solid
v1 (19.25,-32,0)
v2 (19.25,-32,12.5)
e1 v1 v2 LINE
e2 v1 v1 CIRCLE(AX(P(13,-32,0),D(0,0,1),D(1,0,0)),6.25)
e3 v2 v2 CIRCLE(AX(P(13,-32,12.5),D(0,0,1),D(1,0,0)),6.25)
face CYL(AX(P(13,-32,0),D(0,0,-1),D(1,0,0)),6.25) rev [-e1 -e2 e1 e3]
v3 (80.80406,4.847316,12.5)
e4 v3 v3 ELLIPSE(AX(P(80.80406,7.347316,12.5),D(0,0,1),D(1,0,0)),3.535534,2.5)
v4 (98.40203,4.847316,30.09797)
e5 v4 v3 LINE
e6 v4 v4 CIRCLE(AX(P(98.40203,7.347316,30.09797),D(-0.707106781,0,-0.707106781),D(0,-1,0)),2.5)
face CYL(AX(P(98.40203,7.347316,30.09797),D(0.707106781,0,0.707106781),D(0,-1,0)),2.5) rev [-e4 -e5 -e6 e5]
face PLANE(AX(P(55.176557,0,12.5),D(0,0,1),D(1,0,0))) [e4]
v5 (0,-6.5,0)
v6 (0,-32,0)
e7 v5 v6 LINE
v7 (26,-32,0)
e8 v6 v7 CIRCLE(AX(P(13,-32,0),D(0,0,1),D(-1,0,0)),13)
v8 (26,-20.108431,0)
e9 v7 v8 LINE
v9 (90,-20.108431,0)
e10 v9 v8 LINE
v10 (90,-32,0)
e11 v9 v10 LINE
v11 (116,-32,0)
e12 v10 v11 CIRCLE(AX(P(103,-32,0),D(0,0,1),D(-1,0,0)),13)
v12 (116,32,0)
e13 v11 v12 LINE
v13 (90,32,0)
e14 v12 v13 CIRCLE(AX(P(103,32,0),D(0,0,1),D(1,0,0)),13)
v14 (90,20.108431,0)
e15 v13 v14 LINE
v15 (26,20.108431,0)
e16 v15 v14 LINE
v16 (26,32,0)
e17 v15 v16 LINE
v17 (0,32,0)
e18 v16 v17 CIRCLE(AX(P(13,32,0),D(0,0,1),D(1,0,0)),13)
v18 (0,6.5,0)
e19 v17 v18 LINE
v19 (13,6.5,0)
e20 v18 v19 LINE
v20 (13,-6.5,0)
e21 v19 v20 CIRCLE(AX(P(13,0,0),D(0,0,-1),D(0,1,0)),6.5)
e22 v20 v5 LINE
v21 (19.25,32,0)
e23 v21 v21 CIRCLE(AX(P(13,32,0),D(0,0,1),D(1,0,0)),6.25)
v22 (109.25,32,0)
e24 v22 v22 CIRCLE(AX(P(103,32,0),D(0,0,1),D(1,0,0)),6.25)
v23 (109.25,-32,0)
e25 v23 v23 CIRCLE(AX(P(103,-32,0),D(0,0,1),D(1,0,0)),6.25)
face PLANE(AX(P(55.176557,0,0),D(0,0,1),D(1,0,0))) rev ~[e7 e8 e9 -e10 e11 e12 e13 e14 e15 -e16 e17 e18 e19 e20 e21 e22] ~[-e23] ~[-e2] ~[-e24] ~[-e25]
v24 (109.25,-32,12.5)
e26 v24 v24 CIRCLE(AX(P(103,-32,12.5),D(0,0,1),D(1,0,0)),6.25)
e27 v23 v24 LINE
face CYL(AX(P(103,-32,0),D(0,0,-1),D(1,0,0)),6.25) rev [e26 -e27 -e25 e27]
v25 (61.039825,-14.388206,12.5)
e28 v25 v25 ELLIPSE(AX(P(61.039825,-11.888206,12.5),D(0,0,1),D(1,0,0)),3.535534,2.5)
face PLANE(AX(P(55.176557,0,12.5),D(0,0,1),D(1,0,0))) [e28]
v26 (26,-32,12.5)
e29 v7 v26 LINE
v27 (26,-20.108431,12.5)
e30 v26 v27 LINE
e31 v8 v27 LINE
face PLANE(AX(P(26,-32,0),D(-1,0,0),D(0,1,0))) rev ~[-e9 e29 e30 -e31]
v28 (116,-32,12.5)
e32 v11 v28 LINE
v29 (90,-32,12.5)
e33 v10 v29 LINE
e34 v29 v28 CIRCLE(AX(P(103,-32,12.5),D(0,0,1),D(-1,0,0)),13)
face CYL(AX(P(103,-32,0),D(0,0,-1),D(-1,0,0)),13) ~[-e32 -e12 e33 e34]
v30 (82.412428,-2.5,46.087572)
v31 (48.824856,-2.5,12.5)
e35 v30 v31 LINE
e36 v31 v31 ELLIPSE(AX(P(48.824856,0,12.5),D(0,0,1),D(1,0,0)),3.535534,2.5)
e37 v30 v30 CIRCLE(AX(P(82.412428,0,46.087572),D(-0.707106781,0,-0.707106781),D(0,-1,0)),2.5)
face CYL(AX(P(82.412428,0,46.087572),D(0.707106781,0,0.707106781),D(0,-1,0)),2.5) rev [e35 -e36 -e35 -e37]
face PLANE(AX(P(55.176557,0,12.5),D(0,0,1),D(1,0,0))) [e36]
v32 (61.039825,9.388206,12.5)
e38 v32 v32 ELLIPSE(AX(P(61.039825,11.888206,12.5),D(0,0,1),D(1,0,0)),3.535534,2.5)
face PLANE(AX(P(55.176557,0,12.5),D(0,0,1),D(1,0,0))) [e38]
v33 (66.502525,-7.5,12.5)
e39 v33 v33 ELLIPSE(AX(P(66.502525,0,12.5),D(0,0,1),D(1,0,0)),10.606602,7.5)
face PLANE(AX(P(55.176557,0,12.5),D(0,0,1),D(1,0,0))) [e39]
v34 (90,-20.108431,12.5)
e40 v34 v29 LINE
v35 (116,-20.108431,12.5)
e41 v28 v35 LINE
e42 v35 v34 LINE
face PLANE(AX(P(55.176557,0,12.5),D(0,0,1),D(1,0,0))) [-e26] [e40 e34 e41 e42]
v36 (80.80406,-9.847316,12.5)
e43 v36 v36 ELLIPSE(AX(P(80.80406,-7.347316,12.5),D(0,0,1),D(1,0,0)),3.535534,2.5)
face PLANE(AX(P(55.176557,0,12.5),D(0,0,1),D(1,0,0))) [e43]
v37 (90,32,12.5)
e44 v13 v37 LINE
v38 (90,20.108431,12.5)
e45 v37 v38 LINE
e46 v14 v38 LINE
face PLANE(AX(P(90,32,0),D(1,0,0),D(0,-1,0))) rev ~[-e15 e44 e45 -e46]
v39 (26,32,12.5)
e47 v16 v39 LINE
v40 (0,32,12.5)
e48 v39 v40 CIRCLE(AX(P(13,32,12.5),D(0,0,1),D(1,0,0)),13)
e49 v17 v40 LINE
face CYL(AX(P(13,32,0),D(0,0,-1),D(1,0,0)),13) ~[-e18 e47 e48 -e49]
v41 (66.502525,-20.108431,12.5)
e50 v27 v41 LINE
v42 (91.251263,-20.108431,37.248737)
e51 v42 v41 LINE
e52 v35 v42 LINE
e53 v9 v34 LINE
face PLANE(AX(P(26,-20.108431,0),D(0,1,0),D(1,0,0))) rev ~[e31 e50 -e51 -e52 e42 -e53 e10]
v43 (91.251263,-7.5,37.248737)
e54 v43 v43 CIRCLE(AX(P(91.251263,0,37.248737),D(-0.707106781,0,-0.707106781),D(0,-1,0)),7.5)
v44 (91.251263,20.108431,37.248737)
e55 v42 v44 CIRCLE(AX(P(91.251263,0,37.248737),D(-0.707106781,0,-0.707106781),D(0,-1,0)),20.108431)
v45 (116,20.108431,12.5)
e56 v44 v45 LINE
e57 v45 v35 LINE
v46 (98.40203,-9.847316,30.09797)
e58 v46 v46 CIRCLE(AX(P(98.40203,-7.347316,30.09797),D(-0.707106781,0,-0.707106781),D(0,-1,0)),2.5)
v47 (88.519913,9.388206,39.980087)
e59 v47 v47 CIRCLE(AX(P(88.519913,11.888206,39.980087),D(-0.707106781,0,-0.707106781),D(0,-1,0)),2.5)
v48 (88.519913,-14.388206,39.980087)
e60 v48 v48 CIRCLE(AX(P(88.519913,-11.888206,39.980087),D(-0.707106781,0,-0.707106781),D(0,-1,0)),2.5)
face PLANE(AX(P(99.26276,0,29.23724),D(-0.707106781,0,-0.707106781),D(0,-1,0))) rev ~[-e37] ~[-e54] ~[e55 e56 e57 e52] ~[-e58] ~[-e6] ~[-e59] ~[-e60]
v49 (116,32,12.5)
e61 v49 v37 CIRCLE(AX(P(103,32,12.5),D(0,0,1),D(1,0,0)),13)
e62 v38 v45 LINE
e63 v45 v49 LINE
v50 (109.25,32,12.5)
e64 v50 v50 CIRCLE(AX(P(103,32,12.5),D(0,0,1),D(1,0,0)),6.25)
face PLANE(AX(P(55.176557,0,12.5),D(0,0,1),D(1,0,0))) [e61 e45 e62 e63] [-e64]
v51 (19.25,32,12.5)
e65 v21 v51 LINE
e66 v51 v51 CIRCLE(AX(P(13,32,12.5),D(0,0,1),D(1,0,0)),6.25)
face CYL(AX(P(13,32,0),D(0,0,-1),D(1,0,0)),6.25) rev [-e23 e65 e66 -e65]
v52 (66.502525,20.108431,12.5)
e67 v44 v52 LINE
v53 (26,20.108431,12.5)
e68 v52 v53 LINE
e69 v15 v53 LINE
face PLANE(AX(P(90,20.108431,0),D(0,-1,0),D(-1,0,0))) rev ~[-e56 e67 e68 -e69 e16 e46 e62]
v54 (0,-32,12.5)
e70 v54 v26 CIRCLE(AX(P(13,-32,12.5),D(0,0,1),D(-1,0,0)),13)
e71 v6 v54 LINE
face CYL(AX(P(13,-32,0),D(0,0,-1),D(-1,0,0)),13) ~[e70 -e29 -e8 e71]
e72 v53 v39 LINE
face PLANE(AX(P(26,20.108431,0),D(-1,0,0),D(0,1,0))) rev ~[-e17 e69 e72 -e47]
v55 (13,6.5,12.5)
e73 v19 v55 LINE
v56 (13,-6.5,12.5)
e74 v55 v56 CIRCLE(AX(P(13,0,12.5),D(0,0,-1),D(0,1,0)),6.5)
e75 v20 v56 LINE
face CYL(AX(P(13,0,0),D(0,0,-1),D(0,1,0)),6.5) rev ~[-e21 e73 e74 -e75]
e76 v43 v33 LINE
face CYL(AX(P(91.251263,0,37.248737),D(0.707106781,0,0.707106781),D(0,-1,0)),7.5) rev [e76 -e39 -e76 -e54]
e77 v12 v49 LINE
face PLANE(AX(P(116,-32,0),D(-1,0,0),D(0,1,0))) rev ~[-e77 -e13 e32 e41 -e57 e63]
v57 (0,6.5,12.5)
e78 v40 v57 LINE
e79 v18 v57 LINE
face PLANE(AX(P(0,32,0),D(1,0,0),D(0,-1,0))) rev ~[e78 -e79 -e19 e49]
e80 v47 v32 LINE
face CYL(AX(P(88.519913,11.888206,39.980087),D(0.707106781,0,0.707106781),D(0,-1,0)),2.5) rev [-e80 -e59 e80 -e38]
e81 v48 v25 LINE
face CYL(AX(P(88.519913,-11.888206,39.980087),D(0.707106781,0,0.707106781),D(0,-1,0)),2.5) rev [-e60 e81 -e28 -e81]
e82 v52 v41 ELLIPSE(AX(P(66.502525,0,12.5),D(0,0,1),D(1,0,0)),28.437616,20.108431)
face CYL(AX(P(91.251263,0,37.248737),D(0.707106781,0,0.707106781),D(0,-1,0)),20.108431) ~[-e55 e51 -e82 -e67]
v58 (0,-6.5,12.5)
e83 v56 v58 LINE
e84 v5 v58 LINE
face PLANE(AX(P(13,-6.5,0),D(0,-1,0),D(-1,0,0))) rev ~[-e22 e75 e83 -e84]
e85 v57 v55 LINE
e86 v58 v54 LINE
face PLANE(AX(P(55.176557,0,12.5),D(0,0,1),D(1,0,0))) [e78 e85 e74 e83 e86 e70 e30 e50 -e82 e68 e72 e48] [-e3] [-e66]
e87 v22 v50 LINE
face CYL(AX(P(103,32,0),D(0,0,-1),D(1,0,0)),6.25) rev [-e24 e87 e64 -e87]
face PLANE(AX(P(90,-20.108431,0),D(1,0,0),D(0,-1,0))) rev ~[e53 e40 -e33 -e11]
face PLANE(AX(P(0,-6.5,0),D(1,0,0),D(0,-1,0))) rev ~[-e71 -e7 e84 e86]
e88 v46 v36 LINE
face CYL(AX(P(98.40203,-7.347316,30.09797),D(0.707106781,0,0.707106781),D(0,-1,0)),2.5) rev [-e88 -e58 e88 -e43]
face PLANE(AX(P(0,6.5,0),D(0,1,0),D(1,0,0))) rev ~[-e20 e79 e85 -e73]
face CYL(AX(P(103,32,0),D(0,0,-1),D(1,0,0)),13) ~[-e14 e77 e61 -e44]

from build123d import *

# Parameters (mm, degrees)
F0_R     = 6.25
F1_DEPTH = 12.5
F3_R     = 2.5
F3_R_2   = 7.5
F4_REACH = 159.0869091096


with BuildPart() as f1:
    # F0 (on Top) → F1 (new body)
    with BuildSketch(Plane.XY):
        with BuildLine():
            Line((0, 32), (0, 6.5))
            Line((0, 6.5), (13, 6.5))
            ThreePointArc((13, 6.5), (19.5, 0), (13, -6.5))
            Line((13, -6.5), (0, -6.5))
            Line((0, -6.5), (0, -32))
            ThreePointArc((0, -32), (13, -45), (26, -32))
            Line((26, -32), (26, -20.1084308683))
            Line((26, -20.1084308683), (90, -20.1084308683))
            Line((90, -20.1084308683), (90, -32))
            ThreePointArc((90, -32), (103, -45), (116, -32))
            Line((116, -32), (116, 32))
            ThreePointArc((116, 32), (103, 45), (90, 32))
            Line((90, 32), (90, 20.1084308683))
            Line((90, 20.1084308683), (26, 20.1084308683))
            Line((26, 20.1084308683), (26, 32))
            ThreePointArc((26, 32), (13, 45), (0, 32))
        make_face()
        with Locations((13, -32)):
            Circle(F0_R, mode=Mode.SUBTRACT)
        with Locations((103, -32)):
            Circle(F0_R, mode=Mode.SUBTRACT)
        with Locations((13, 32)):
            Circle(F0_R, mode=Mode.SUBTRACT)
        with Locations((103, 32)):
            Circle(F0_R, mode=Mode.SUBTRACT)
    extrude(amount=F1_DEPTH)

    f4_end = f1.faces().sort_by_distance((59.8447932422, 0, 0))[0]
    # F3 (on face) → F4 (join, up to a face of the model that its end follows)
    with BuildSketch(Plane(origin=(64.25, 0, 64.25), x_dir=(0, -1, 0), z_dir=(-0.7071067812, 0, -0.7071067812))):
        with BuildLine():
            Line((-20.1084308683, -73.1855518528), (20.1084308683, -73.1855518528))
            Line((20.1084308683, -73.1855518528), (20.1084308683, -38.1855518528))
            ThreePointArc((20.1084308683, -38.1855518528), (0, -18.0771209845), (-20.1084308683, -38.1855518528))
            Line((-20.1084308683, -38.1855518528), (-20.1084308683, -73.1855518528))
        make_face()
        with Locations((-7.3473156537, -48.2982642825)):
            Circle(F3_R, mode=Mode.SUBTRACT)
        with Locations((7.3473156537, -48.2982642825)):
            Circle(F3_R, mode=Mode.SUBTRACT)
        with Locations((-11.8882064537, -34.3228394231)):
            Circle(F3_R, mode=Mode.SUBTRACT)
        with Locations((0, -38.1855518528)):
            Circle(F3_R_2, mode=Mode.SUBTRACT)
        with Locations((11.8882064537, -34.3228394231)):
            Circle(F3_R, mode=Mode.SUBTRACT)
        with Locations((0, -25.6855518528)):
            Circle(F3_R, mode=Mode.SUBTRACT)
    f4_long = extrude(amount=F4_REACH, mode=Mode.PRIVATE)
    add(split(f4_long, bisect_by=f4_end, keep=Keep.BOTTOM, mode=Mode.PRIVATE))


solid = f1.part
